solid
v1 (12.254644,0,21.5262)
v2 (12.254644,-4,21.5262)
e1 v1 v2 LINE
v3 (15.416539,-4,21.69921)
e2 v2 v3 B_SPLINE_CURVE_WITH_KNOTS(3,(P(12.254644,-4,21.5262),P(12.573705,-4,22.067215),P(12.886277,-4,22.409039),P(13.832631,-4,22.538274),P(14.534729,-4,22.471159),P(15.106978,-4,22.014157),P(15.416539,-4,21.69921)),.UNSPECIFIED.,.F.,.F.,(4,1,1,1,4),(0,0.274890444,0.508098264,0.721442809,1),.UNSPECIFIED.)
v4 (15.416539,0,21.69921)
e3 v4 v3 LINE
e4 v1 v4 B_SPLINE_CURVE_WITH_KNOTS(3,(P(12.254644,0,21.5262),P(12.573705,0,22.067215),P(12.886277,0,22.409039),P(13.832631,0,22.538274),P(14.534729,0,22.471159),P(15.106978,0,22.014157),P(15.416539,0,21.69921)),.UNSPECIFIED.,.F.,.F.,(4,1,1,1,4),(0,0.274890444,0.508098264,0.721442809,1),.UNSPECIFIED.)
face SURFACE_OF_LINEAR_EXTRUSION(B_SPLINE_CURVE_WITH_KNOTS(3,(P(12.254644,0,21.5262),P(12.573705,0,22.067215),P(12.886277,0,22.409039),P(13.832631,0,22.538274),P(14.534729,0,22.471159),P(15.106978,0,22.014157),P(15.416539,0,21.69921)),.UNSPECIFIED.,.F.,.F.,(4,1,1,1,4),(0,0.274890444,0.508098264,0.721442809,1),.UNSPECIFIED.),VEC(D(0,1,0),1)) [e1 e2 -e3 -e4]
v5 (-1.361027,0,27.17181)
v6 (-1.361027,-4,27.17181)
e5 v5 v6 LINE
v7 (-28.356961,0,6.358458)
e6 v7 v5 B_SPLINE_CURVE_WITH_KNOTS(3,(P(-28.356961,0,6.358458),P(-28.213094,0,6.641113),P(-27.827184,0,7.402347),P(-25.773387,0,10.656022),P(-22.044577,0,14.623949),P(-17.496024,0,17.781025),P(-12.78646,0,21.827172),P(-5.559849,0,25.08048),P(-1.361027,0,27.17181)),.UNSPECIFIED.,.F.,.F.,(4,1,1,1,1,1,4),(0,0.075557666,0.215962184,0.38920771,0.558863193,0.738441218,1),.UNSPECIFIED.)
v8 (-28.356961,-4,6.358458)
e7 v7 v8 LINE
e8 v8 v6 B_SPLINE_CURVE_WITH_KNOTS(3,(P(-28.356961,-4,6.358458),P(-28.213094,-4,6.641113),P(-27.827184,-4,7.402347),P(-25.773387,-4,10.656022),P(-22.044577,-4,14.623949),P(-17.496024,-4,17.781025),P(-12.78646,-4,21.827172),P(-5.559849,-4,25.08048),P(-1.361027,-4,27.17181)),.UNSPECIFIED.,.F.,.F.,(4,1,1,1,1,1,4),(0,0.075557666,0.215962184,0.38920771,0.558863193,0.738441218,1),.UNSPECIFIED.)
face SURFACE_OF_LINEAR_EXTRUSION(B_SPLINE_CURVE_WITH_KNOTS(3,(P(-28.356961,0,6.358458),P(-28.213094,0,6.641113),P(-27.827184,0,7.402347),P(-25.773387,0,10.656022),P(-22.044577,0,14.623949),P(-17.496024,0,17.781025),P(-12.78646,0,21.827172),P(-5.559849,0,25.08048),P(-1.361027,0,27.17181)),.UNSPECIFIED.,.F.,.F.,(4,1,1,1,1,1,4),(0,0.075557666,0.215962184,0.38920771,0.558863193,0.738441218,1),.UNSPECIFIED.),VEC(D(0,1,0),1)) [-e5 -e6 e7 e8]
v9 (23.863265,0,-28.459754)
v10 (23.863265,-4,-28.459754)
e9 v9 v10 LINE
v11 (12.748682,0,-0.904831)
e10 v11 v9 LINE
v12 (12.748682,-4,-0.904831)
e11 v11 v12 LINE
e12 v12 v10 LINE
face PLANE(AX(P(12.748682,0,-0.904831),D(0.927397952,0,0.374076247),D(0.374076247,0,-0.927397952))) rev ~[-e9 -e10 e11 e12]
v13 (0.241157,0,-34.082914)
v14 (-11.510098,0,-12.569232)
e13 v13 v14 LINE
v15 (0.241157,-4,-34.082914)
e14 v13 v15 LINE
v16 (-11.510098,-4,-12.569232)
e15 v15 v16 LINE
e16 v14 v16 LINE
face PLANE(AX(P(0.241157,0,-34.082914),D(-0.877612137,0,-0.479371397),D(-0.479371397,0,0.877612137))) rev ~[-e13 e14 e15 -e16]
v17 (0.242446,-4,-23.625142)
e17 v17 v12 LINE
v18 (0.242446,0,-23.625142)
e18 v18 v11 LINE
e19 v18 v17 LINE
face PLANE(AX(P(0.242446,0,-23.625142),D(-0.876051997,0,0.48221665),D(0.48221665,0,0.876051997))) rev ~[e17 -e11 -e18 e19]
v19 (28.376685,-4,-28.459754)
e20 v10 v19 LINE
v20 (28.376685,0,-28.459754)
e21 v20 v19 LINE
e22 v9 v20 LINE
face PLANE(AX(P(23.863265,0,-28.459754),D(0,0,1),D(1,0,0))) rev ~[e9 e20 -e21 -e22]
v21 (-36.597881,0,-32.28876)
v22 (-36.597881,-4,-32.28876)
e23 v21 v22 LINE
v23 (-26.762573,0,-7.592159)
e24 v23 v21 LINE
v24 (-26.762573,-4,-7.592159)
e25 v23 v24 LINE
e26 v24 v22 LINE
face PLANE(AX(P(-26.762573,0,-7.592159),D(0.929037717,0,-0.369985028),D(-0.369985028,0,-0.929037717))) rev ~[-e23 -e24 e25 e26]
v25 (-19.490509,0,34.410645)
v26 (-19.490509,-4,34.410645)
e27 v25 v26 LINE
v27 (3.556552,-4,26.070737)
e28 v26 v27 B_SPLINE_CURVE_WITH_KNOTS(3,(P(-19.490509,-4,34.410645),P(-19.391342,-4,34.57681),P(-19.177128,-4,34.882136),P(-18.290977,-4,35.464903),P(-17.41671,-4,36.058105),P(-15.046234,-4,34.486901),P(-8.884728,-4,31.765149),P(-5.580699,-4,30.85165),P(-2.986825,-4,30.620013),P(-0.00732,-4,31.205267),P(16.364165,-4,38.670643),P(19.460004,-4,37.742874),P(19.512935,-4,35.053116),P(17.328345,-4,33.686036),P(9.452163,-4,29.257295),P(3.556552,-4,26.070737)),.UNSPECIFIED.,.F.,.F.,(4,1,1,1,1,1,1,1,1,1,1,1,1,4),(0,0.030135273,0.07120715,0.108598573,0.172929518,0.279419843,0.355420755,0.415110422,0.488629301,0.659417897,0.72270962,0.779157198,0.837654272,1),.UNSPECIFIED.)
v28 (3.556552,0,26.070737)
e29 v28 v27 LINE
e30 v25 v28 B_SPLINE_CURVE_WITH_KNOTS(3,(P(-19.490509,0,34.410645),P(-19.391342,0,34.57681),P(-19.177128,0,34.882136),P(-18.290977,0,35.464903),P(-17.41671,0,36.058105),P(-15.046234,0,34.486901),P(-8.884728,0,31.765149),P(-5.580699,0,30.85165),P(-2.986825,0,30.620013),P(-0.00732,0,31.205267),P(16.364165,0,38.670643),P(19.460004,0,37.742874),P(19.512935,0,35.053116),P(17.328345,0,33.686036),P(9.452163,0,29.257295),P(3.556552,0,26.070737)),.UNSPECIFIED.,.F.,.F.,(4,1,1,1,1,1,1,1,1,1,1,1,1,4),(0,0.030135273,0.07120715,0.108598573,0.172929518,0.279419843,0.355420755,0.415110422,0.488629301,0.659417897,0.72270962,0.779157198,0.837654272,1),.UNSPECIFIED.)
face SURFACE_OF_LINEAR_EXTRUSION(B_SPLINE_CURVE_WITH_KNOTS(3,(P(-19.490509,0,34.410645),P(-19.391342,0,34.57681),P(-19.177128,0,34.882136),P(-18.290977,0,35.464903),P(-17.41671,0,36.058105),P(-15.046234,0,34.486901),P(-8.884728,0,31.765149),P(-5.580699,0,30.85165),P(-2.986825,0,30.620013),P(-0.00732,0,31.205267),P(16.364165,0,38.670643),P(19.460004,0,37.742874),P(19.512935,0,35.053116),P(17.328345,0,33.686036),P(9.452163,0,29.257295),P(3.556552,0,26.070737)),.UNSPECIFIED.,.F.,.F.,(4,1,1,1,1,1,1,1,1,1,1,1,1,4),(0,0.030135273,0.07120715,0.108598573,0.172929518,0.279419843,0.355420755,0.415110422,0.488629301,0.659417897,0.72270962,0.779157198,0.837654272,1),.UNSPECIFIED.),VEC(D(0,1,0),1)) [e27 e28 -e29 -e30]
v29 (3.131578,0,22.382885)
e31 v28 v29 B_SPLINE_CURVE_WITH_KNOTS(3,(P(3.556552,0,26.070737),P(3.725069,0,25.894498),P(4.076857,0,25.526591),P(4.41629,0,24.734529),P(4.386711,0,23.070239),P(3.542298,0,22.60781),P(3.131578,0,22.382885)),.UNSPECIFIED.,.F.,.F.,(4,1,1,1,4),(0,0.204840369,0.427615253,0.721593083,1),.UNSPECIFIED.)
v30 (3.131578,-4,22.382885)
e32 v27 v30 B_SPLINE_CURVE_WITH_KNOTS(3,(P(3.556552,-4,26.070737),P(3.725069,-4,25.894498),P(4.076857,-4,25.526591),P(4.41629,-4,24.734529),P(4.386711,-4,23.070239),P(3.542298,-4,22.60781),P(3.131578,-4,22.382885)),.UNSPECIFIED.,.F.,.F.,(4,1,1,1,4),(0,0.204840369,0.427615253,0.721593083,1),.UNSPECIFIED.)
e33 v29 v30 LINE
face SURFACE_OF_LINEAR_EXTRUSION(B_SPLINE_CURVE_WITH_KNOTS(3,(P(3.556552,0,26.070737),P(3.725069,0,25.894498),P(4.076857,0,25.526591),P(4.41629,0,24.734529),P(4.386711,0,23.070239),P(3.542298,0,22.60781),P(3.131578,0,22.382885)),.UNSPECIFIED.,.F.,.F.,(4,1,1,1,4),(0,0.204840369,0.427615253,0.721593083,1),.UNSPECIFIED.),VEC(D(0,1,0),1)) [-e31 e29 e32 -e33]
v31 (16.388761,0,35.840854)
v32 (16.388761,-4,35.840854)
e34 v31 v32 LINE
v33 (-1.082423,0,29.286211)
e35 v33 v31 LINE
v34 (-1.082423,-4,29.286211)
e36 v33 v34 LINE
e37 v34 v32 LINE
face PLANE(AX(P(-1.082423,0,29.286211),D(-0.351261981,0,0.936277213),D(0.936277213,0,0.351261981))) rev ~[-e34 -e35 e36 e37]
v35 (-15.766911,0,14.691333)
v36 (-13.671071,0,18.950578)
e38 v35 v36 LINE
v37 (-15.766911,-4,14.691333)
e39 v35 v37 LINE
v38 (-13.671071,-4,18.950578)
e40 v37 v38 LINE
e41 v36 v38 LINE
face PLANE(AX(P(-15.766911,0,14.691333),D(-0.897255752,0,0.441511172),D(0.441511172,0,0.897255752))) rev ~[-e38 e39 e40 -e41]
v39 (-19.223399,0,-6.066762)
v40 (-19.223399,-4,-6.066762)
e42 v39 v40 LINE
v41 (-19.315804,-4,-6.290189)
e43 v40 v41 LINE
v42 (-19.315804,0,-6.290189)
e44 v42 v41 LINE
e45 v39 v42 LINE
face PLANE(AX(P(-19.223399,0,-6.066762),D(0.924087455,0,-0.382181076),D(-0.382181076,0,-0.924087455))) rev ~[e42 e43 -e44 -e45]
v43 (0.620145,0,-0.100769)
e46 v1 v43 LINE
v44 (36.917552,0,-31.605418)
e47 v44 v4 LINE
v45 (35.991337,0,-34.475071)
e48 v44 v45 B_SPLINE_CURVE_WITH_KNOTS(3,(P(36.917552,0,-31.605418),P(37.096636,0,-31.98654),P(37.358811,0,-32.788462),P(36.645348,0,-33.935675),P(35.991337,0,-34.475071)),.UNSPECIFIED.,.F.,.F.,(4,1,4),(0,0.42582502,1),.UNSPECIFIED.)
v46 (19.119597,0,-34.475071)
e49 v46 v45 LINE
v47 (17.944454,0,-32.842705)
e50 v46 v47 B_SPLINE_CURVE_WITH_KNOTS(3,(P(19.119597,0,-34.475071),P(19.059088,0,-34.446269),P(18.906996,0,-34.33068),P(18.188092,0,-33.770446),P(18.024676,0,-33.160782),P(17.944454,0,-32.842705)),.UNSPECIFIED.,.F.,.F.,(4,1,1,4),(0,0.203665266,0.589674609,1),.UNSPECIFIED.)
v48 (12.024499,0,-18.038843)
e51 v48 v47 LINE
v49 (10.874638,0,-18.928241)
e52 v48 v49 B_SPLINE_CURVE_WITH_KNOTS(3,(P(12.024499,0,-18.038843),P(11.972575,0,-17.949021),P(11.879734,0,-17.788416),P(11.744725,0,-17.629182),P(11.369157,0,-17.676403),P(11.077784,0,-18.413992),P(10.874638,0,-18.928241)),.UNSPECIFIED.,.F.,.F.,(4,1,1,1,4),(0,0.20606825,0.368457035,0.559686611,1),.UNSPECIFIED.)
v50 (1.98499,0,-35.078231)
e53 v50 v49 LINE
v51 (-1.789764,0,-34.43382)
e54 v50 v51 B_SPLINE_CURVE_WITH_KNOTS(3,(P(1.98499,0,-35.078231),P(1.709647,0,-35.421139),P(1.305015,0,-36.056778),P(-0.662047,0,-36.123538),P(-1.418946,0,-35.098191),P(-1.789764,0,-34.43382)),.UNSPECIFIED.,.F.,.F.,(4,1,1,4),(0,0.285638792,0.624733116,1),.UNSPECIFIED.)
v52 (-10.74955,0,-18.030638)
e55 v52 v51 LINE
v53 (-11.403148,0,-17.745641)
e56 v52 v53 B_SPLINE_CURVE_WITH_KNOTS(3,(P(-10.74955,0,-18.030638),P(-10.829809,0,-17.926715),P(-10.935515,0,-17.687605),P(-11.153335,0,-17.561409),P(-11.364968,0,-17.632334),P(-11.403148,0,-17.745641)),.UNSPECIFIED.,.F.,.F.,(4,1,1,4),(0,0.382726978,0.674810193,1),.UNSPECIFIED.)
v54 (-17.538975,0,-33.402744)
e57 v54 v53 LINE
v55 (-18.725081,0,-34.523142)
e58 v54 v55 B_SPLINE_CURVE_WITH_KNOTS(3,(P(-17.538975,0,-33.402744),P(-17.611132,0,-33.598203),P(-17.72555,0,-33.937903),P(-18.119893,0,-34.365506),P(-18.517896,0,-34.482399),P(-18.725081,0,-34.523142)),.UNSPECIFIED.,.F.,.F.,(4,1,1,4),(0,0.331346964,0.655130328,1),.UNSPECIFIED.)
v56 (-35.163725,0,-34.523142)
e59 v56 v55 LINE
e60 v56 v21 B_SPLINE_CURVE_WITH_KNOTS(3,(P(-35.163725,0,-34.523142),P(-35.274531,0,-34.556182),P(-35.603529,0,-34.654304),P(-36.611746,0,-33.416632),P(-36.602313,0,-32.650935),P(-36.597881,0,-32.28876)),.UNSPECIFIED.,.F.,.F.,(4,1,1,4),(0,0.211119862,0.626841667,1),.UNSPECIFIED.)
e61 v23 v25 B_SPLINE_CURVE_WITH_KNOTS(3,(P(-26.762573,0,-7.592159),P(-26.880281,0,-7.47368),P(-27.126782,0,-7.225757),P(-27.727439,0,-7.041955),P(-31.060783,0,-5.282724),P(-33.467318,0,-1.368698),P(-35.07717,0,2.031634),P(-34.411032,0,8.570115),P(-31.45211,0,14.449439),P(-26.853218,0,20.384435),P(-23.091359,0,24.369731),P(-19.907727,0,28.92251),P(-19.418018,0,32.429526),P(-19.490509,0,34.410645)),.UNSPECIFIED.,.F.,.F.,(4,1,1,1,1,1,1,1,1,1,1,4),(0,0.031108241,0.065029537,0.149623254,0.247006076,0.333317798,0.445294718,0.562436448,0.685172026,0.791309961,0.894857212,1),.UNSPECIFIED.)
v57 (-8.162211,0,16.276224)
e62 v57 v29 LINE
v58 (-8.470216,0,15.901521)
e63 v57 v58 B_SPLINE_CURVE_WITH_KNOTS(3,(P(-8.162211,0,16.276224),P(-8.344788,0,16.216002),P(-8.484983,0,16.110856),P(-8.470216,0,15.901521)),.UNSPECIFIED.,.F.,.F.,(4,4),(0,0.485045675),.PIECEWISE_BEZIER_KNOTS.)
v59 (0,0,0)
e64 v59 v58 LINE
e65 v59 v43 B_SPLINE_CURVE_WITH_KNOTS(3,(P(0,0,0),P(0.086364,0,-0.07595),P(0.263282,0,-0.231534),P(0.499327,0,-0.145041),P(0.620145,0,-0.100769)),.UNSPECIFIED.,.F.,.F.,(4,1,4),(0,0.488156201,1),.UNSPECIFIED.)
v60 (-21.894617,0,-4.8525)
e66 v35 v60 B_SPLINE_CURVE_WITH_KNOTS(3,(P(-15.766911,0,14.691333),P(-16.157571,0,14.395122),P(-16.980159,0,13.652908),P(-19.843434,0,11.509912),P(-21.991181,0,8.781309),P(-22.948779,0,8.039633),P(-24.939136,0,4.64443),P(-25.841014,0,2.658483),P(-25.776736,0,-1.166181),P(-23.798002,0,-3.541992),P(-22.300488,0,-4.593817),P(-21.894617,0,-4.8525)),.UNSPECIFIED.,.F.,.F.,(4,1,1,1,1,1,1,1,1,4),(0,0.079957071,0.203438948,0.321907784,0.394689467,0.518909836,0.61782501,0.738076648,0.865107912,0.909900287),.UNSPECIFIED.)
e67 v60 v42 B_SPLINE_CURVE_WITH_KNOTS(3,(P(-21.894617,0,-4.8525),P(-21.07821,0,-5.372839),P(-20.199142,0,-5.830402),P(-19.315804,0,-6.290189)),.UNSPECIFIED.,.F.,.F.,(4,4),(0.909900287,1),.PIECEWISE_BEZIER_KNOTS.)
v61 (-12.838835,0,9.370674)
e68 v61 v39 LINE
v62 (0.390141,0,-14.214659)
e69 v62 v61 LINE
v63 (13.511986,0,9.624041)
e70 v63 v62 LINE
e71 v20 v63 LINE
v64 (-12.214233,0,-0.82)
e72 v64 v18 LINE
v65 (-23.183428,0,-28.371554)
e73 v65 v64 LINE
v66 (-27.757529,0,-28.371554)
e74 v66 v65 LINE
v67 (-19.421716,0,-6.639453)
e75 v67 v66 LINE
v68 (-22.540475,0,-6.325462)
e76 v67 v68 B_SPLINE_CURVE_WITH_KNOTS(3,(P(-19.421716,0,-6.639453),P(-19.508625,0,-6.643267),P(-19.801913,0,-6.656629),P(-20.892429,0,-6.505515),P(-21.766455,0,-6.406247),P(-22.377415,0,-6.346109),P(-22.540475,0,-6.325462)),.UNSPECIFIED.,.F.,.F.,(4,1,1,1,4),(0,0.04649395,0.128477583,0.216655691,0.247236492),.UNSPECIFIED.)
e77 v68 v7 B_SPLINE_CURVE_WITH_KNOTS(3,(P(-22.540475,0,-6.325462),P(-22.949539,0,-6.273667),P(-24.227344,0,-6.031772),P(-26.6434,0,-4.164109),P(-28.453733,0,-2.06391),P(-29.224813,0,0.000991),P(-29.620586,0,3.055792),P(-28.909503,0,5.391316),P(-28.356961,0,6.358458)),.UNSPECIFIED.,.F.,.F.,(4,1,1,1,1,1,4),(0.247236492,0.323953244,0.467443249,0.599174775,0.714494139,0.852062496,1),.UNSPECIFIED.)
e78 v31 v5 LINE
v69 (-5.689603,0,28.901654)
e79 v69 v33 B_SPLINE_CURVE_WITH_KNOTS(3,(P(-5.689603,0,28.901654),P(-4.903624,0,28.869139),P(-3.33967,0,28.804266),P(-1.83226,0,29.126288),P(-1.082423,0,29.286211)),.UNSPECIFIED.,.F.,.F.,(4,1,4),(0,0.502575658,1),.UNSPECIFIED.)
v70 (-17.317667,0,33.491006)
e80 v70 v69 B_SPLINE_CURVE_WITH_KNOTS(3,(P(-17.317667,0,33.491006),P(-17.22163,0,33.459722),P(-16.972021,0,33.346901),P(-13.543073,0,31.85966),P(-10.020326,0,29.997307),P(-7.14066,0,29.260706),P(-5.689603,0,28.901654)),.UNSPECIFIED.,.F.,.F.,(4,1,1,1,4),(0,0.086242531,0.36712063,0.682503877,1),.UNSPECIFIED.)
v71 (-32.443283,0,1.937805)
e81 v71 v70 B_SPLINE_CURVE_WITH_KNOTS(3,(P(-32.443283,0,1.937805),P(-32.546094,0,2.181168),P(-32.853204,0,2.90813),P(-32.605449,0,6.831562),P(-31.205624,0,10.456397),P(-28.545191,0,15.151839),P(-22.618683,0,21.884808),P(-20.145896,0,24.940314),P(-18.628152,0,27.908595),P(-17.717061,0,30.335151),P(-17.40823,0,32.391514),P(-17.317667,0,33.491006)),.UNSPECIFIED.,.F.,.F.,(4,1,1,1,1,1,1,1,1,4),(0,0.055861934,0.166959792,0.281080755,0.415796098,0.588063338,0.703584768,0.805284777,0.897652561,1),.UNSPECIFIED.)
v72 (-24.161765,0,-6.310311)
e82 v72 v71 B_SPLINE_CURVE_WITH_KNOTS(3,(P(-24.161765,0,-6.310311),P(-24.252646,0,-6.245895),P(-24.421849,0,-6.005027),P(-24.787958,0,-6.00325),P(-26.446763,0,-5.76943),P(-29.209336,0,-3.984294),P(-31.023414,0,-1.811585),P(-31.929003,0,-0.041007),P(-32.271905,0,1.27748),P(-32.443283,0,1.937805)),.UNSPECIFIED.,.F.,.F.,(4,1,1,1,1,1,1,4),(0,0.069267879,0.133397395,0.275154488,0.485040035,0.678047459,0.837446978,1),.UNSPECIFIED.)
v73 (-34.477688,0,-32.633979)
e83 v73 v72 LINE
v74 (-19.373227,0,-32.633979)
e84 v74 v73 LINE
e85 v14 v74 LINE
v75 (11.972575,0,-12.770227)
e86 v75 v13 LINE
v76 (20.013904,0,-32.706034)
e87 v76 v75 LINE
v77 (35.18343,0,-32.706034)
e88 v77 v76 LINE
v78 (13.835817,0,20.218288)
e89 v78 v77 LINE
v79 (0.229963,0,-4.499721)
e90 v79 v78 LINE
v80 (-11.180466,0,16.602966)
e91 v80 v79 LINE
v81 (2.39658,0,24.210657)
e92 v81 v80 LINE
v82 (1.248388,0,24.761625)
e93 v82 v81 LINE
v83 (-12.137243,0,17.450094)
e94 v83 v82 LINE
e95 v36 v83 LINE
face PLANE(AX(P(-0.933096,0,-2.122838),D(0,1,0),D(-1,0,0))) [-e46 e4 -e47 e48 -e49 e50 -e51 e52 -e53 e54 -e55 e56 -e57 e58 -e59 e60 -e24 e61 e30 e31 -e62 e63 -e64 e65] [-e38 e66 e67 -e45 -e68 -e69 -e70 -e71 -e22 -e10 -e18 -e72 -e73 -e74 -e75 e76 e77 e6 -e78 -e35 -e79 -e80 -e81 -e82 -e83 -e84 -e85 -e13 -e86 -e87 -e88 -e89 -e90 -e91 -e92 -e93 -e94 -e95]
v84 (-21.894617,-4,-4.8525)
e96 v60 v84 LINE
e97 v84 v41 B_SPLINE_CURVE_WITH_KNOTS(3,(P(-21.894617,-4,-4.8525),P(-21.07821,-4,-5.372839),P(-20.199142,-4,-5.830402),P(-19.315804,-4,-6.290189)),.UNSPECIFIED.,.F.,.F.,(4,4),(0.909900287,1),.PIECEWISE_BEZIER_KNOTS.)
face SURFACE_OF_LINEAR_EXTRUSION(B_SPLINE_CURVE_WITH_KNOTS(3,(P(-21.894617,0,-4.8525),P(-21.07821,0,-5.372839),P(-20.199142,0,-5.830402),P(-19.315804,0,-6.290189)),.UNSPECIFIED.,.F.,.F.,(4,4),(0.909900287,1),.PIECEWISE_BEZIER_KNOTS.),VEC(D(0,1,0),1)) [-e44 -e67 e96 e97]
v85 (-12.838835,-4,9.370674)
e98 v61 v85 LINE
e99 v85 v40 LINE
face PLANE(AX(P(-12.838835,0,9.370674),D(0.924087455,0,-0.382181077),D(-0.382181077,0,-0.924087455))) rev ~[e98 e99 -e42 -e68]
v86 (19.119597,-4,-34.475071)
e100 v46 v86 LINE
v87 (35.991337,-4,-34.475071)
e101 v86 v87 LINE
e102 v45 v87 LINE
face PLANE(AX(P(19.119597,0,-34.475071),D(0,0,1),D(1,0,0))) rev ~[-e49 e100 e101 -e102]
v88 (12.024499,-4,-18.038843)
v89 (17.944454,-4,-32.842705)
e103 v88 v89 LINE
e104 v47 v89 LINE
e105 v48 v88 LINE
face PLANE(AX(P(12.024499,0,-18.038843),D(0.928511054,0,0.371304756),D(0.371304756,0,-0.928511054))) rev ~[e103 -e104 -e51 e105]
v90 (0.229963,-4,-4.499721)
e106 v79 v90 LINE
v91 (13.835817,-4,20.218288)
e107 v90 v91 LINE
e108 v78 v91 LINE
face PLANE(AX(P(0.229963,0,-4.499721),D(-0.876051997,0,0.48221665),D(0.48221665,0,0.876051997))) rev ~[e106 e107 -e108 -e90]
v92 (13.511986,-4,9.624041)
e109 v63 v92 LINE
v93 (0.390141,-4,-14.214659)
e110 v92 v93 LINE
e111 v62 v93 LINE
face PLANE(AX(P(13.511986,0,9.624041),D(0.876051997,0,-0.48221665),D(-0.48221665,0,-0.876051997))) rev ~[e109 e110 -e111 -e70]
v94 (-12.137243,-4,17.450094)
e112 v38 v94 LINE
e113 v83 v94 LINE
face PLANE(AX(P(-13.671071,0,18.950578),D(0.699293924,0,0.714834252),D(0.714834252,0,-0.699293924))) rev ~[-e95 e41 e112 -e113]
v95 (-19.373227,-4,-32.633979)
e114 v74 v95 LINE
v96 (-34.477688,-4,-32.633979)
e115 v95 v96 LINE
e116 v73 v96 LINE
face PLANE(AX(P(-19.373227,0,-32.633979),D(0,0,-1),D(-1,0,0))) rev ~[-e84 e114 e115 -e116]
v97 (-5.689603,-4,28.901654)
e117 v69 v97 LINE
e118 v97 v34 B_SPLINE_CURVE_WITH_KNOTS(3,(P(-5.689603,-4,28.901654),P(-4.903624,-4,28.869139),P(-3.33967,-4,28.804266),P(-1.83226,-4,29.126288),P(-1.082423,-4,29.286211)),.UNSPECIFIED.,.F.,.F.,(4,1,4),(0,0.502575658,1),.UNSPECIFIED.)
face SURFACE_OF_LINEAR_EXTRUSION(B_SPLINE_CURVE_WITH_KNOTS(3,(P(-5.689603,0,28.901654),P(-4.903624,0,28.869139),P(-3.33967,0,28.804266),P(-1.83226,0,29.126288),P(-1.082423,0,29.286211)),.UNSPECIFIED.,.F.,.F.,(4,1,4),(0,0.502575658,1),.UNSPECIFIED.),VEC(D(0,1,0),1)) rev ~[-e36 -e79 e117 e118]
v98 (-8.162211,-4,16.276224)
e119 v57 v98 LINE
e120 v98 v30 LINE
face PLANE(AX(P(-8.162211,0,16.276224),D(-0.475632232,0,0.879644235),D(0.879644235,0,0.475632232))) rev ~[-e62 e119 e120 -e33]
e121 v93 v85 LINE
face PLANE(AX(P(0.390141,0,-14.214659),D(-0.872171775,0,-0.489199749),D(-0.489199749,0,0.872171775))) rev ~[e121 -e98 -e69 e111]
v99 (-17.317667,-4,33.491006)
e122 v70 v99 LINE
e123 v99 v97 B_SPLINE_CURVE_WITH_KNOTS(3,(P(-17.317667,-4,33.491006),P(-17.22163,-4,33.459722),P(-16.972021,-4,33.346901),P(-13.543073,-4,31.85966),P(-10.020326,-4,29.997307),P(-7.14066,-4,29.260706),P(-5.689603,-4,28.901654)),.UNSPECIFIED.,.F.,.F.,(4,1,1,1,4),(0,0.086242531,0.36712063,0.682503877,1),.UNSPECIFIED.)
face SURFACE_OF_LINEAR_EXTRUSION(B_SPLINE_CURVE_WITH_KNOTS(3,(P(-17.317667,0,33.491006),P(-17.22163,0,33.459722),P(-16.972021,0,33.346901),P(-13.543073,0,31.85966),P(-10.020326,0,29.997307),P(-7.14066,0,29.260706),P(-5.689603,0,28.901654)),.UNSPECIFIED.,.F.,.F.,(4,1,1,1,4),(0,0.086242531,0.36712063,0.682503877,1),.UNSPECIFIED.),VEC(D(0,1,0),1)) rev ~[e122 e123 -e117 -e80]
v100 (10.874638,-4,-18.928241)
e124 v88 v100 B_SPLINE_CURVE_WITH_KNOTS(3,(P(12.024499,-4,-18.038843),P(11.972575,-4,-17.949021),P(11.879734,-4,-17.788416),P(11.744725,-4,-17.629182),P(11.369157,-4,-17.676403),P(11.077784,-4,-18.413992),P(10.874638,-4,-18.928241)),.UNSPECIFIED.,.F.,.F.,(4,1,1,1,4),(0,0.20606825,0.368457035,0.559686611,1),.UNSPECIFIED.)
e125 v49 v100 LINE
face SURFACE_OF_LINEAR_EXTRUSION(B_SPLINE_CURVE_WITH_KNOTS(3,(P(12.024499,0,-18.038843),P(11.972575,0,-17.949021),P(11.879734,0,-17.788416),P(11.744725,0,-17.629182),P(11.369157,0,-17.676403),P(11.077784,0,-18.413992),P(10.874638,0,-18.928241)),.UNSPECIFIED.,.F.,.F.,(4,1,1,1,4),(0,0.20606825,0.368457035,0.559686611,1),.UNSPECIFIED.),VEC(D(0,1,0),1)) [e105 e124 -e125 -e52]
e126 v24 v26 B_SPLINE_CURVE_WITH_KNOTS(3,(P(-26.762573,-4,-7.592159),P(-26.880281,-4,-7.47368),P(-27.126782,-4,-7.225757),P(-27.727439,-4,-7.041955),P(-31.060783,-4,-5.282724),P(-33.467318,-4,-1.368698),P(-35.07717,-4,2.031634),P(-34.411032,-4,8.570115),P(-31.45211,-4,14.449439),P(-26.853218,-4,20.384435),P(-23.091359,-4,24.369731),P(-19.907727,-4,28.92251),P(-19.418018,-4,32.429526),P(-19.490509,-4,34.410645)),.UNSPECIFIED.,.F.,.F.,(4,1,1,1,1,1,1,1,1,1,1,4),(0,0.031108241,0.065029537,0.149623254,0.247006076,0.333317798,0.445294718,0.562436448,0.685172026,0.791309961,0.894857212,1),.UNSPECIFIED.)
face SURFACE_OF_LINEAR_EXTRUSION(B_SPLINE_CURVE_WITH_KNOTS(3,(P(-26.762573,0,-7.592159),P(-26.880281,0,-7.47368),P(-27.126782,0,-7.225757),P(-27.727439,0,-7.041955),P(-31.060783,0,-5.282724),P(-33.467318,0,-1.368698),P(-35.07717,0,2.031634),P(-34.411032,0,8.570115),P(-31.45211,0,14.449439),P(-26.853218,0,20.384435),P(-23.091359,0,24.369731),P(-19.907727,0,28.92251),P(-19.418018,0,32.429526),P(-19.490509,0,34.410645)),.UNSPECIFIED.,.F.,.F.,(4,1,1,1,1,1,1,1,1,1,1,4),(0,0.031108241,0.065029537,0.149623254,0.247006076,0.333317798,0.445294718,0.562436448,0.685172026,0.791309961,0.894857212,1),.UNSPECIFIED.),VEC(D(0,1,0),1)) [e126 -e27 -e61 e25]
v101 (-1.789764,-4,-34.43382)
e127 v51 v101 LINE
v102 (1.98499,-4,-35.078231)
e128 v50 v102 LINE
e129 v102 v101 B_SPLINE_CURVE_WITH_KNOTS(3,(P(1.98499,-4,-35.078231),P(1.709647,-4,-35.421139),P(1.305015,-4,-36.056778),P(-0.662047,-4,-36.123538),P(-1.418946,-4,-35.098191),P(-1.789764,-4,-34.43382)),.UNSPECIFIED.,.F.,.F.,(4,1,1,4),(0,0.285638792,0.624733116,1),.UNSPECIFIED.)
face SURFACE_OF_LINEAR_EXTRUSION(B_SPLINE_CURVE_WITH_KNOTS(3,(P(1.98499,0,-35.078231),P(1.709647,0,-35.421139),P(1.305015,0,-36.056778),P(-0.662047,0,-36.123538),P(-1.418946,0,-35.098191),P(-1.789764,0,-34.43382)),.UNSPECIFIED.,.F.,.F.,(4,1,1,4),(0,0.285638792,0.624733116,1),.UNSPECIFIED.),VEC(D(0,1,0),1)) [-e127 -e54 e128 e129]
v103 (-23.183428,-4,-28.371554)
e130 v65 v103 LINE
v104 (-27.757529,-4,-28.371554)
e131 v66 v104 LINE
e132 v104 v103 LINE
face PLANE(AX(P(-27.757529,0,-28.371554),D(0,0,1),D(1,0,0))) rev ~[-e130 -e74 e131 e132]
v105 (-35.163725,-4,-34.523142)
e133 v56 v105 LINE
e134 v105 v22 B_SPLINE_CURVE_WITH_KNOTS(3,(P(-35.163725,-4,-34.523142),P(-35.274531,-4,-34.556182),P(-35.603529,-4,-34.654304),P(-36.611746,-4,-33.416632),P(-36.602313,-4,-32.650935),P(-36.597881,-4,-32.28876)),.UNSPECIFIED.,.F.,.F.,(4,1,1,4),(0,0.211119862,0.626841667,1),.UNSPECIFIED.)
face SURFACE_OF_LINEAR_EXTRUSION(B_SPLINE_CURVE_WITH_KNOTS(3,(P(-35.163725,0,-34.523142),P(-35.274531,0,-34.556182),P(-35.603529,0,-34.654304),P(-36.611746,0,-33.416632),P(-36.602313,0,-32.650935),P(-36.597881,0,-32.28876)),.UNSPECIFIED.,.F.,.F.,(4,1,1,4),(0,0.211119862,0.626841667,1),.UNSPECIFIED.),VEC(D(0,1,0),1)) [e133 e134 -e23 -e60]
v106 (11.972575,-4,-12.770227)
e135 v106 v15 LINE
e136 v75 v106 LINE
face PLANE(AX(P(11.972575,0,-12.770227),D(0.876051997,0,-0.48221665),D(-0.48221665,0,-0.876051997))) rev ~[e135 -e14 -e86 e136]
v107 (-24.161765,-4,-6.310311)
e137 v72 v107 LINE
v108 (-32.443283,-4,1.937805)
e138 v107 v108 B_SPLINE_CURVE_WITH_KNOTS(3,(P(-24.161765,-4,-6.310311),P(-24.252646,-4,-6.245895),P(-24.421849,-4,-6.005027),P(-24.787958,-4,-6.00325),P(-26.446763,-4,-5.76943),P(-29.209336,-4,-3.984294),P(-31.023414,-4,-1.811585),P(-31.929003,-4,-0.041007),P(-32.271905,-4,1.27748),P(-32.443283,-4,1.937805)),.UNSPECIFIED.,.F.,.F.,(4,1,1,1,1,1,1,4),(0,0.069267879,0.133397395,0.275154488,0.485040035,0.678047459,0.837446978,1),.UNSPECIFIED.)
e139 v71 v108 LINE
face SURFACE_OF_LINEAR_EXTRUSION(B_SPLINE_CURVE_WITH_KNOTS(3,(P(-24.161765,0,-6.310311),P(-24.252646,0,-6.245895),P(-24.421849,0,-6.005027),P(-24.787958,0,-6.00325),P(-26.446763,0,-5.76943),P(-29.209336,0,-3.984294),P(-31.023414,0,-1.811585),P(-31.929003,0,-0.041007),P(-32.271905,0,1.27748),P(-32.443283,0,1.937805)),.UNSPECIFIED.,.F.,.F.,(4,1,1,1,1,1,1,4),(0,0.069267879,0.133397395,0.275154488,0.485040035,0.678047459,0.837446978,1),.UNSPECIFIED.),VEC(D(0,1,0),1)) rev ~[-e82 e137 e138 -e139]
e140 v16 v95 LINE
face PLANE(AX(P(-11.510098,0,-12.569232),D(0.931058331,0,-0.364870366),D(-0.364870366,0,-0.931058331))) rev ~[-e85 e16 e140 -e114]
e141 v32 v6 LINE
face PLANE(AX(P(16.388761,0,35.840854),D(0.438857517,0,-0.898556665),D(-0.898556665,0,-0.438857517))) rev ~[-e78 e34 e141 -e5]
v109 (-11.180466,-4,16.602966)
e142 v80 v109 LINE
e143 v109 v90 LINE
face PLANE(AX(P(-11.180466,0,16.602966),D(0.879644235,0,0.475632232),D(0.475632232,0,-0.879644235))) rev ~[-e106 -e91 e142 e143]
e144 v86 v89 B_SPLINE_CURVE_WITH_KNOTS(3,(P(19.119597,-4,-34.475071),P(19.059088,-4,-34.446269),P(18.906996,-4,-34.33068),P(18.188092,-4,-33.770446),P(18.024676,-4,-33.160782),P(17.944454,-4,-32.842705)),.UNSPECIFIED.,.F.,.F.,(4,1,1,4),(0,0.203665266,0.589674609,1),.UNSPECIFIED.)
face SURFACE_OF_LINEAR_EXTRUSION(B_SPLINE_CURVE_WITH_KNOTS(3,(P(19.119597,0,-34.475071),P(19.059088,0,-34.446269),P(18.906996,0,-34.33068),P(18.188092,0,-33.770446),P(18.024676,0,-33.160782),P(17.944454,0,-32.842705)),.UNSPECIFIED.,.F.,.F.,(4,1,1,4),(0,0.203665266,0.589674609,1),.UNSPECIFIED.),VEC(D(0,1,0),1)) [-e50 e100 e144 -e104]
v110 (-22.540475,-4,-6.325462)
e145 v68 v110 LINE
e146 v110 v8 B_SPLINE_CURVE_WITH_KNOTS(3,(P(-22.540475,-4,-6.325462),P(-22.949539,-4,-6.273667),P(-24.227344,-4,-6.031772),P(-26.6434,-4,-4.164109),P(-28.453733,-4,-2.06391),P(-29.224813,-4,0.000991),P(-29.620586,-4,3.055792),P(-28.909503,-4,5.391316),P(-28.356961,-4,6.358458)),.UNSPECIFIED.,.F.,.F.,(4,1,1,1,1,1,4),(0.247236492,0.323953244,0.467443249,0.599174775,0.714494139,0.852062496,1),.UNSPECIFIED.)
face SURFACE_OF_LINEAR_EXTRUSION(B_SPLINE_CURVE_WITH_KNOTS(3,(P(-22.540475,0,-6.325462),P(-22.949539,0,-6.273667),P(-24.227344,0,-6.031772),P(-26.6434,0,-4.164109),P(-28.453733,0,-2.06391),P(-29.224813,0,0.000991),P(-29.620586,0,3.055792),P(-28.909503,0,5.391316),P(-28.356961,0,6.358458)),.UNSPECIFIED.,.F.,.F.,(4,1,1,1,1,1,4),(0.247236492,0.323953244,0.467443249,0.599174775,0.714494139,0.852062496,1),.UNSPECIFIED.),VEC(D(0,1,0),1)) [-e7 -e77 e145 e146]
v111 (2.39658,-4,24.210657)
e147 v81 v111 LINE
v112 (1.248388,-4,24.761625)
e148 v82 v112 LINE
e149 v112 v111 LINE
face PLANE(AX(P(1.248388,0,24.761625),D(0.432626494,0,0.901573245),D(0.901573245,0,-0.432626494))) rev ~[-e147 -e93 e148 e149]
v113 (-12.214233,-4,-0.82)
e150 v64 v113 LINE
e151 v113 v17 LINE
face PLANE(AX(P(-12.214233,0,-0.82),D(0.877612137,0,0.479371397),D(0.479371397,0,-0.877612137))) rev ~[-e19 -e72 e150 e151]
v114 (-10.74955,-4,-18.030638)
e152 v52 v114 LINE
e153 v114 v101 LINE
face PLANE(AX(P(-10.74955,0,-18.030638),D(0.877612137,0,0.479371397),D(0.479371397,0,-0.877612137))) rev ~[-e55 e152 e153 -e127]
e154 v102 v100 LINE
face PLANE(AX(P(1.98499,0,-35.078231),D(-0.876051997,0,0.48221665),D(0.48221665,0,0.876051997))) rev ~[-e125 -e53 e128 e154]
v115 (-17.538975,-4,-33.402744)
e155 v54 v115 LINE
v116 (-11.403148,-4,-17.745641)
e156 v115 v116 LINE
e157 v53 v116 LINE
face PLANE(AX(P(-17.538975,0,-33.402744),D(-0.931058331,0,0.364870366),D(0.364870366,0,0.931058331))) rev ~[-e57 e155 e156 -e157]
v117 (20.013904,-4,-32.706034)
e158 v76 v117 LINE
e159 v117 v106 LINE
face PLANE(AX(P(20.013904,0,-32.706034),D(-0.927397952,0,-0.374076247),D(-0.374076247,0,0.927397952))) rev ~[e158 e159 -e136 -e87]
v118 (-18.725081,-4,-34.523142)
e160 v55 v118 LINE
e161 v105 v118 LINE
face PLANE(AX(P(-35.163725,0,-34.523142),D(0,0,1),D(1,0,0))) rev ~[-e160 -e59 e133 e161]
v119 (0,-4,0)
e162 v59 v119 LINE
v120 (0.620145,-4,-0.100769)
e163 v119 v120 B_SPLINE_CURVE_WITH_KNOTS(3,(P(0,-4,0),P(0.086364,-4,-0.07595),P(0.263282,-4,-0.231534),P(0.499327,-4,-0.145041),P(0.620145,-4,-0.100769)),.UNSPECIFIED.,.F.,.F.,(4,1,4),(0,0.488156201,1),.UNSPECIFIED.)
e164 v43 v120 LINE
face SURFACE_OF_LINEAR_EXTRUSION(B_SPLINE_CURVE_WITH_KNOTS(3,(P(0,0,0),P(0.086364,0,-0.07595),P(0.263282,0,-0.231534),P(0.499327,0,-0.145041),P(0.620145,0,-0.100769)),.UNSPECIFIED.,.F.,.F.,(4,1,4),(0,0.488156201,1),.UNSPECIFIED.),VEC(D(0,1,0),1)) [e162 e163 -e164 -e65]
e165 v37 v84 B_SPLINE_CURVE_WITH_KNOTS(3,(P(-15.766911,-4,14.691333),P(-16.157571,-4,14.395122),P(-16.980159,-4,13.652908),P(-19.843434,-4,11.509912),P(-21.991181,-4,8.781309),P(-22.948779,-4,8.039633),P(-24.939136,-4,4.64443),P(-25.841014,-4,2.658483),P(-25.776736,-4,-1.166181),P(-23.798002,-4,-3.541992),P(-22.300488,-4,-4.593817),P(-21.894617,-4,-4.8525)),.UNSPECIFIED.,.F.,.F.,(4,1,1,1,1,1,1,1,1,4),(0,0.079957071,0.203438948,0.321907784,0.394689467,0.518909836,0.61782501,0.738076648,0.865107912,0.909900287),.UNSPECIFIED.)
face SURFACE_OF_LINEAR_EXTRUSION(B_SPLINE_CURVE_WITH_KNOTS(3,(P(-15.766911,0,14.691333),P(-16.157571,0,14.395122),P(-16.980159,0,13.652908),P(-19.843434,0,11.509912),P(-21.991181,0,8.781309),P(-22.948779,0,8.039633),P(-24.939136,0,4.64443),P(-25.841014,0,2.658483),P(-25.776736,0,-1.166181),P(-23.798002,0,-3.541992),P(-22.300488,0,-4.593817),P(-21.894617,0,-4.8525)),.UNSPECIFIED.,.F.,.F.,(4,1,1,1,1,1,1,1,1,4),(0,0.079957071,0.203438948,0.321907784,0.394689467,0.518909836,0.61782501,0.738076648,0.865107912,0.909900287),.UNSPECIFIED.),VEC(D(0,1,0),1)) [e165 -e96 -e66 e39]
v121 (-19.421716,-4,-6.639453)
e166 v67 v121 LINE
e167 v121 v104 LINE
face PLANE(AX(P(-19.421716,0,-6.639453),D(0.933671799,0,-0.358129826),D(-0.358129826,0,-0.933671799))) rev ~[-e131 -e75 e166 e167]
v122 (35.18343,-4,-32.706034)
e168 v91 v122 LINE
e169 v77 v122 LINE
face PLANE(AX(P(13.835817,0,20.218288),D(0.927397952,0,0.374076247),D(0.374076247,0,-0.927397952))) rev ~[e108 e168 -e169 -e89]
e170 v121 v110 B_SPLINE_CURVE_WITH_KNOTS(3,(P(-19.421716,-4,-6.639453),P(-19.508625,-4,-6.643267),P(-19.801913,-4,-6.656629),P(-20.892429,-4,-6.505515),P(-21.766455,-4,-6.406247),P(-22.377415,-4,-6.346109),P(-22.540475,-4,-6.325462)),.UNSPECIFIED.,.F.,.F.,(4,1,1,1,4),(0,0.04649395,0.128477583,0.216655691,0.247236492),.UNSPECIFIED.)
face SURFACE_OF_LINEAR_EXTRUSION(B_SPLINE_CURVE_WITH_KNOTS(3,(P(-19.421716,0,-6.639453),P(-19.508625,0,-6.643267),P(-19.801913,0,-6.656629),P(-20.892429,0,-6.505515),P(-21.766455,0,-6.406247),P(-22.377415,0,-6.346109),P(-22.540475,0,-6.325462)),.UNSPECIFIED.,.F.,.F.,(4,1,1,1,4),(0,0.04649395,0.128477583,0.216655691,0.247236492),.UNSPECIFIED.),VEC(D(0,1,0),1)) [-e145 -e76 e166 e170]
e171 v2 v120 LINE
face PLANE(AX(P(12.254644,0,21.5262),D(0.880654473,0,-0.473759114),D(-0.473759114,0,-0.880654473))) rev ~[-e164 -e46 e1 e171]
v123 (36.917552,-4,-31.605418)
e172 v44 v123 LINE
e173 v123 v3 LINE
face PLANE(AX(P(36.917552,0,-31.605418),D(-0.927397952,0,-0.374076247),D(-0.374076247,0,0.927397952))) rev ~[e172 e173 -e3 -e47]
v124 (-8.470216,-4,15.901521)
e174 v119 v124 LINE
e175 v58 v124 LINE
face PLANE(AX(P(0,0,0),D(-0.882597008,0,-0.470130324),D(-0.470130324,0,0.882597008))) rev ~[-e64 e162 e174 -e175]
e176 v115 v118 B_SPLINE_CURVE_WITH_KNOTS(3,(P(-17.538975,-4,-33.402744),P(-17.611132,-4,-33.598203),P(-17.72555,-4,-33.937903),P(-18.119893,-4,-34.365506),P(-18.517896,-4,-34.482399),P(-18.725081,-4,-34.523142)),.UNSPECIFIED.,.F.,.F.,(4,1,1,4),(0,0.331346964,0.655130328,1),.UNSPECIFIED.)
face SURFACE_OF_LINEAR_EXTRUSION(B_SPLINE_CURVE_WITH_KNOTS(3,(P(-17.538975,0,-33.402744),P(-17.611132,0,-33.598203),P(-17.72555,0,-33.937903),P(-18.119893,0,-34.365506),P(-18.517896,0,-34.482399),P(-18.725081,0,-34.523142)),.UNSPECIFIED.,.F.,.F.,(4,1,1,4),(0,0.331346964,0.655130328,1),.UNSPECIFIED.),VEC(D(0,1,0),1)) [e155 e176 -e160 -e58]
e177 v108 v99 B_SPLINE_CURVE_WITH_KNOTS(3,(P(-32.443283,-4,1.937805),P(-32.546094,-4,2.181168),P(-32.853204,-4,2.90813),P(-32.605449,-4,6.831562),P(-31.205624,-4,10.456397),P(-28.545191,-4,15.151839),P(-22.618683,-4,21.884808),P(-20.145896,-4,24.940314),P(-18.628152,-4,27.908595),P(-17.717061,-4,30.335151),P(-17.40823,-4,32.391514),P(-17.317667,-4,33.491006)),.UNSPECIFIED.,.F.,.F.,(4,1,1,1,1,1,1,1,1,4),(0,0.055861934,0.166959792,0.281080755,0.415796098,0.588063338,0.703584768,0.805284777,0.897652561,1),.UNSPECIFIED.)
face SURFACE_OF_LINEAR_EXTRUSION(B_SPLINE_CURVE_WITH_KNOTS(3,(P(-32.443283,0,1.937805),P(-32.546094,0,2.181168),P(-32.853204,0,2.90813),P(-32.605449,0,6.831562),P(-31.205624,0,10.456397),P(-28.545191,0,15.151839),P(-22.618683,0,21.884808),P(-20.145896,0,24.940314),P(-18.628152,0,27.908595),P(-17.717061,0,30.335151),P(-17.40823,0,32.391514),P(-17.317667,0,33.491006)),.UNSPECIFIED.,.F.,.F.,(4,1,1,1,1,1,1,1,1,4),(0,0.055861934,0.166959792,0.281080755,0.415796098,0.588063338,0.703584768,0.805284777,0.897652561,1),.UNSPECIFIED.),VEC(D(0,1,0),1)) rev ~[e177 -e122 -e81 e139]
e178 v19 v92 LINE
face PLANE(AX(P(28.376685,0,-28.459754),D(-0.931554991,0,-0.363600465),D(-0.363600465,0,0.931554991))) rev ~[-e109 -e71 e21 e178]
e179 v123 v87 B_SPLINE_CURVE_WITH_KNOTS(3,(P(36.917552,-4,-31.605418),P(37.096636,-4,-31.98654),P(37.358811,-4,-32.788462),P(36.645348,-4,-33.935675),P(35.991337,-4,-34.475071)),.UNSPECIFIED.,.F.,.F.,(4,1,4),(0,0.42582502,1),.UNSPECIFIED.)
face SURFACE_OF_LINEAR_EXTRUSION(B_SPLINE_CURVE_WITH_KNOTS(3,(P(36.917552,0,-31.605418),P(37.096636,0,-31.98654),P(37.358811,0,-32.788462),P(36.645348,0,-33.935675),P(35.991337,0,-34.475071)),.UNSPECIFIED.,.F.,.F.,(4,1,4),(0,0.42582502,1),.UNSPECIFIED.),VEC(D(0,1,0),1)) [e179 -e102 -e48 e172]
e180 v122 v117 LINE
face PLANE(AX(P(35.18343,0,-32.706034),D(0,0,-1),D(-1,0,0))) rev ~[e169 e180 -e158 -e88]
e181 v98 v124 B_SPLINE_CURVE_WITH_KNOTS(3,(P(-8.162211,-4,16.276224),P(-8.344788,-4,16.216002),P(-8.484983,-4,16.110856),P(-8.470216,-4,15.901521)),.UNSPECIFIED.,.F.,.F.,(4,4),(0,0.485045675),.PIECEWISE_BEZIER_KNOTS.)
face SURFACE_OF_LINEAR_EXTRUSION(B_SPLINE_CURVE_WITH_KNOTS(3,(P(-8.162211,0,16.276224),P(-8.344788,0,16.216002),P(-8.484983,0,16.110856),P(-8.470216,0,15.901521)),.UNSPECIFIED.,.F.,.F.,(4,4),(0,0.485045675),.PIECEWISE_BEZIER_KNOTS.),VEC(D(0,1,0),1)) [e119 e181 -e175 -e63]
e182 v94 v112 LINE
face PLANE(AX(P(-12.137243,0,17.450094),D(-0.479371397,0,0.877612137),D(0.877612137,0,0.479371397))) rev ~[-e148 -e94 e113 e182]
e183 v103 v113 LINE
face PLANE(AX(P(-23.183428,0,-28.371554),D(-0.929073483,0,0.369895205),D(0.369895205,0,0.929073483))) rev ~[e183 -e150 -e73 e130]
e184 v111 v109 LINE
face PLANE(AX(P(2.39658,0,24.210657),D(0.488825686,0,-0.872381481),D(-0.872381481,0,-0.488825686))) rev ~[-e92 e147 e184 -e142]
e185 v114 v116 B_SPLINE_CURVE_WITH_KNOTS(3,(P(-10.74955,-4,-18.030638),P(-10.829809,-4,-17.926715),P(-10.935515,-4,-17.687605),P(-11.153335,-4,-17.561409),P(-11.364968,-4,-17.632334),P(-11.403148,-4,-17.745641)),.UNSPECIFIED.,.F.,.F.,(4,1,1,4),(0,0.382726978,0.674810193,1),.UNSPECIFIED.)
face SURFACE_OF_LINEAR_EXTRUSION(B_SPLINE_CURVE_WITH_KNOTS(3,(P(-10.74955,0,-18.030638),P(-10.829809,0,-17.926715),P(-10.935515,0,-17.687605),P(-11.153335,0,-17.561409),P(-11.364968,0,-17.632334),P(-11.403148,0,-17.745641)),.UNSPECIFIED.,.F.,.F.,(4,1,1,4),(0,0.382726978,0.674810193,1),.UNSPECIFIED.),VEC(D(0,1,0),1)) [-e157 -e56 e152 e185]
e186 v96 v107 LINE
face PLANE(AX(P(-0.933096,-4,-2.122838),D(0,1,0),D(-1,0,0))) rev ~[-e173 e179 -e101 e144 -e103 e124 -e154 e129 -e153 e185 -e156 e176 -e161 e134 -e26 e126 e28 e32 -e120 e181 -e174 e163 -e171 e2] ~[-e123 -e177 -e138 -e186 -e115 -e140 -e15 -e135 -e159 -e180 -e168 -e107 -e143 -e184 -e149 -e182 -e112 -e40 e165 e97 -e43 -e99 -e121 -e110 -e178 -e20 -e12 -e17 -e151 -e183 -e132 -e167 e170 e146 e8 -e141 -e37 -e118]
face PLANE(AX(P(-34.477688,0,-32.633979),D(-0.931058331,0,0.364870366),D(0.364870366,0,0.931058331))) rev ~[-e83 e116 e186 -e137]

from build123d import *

# Parameters (mm, degrees)
F1_DEPTH = 4
F3_DEPTH = 4


# Not quite as in the source:
# - the program builds the solid bodies; features that only make, move or delete a surface that nothing else refers to are left out


with BuildPart() as f1:
    # F0 (on Front) → F1 (new body)
    with BuildSketch(Plane.XZ):
        Polygon((-19.4217161833, -6.6394530033), (-27.7575291693, -28.3715538681), (-23.1834277511, -28.3715538681), (-12.2142331675, -0.81999955), (0.2424462854, -23.6251421751), (12.7486815966, -0.9048308448), (23.8632653011, -28.4597538413), (28.3766854557, -28.4597538413), (13.5119855407, 9.6240406854), (0.3901409885, -14.2146594537), (-12.8388348967, 9.3706743792), (-19.2233994603, -6.0667619109), (-19.315803546, -6.2901886101), (-19.0307870507, -6.5492987633), align=None)
    extrude(amount=F1_DEPTH)

    # F0 (on Front) → F3 (join)
    with BuildSketch(Plane.XZ):
        with BuildLine():
            add(Edge.make_bspline(
                [(-35.1637251496, -34.5231422063), (-35.2745312626, -34.5561823678), (-35.6035289606, -34.654304467), (-36.6117457532, -33.4166323146), (-36.6023133695, -32.6509350181), (-36.5978814662, -32.2887599468)],
                knots=[0, 0, 0, 0, 0.2111198615, 0.6268416674, 1, 1, 1, 1], degree=3))
            Line((-35.1637251496, -34.5231422063), (-18.7250807702, -34.5231422063))
            add(Edge.make_bspline(
                [(-17.538975038, -33.402744049), (-17.611132101, -33.5982034924), (-17.7255501876, -33.9379030837), (-18.1198933231, -34.3655062286), (-18.5178964655, -34.4823988841), (-18.7250807702, -34.5231422063)],
                knots=[0, 0, 0, 0, 0.3313469636, 0.6551303283, 1, 1, 1, 1], degree=3))
            Line((-17.538975038, -33.402744049), (-11.4031481076, -17.7456413598))
            add(Edge.make_bspline(
                [(-10.749549605, -18.0306378752), (-10.8298087166, -17.9267145736), (-10.9355150168, -17.6876046133), (-11.1533348511, -17.5614089352), (-11.3649684936, -17.6323335618), (-11.4031481076, -17.7456413598)],
                knots=[0, 0, 0, 0, 0.3827269779, 0.6748101929, 1, 1, 1, 1], degree=3))
            Line((-10.749549605, -18.0306378752), (-1.789764151, -34.4338202755))
            add(Edge.make_bspline(
                [(1.9849899689, -35.0782312452), (1.7096466368, -35.4211391418), (1.3050154791, -36.05677829), (-0.6620473159, -36.123537512), (-1.4189460368, -35.0981913004), (-1.789764151, -34.4338202755)],
                knots=[0, 0, 0, 0, 0.2856387916, 0.6247331157, 1, 1, 1, 1], degree=3))
            Line((1.9849899689, -35.0782312452), (10.8746383339, -18.9282409847))
            add(Edge.make_bspline(
                [(12.0244985446, -18.0388428271), (11.9725750544, -17.9490208887), (11.8797340892, -17.78841621), (11.744725143, -17.6291823261), (11.3691565314, -17.67640337), (11.0777840099, -18.4139921669), (10.8746383339, -18.9282409847)],
                knots=[0, 0, 0, 0, 0.2060682504, 0.3684570355, 0.559686611, 1, 1, 1, 1], degree=3))
            Line((12.0244985446, -18.0388428271), (17.9444543715, -32.8427049722))
            add(Edge.make_bspline(
                [(19.1195974171, -34.4750714604), (19.0590878531, -34.4462685115), (18.9069963789, -34.3306804628), (18.1880916185, -33.7704461278), (18.0246763229, -33.1607819226), (17.9444543715, -32.8427049722)],
                knots=[0, 0, 0, 0, 0.2036652656, 0.5896746092, 1, 1, 1, 1], degree=3))
            Line((19.1195974171, -34.4750714604), (35.9913371503, -34.4750714604))
            add(Edge.make_bspline(
                [(36.917551974, -31.6054179477), (37.096636226, -31.9865397753), (37.358811422, -32.7884619292), (36.6453477203, -33.9356747232), (35.9913371503, -34.4750714604)],
                knots=[0, 0, 0, 0, 0.4258250202, 1, 1, 1, 1], degree=3))
            Line((36.917551974, -31.6054179477), (15.4165393649, 21.6992097865))
            add(Edge.make_bspline(
                [(12.2546441238, 21.5262000154), (12.5737046322, 22.0672148588), (12.886276927, 22.4090391583), (13.8326309549, 22.5382735172), (14.5347285525, 22.471159047), (15.1069781666, 22.0141567545), (15.4165393649, 21.6992097865)],
                knots=[0, 0, 0, 0, 0.2748904441, 0.5080982642, 0.721442809, 1, 1, 1, 1], degree=3))
            Line((12.2546441238, 21.5262000154), (0.6201447686, -0.1007694518))
            add(Edge.make_bspline(
                [(0, 0), (0.0863636294, -0.0759495763), (0.2632816512, -0.2315341538), (0.4993266168, -0.1450406271), (0.6201447686, -0.1007694518)],
                knots=[0, 0, 0, 0, 0.4881562014, 1, 1, 1, 1], degree=3))
            Line((0, 0), (-8.4702158347, 15.9015208483))
            add(Edge.make_bspline(
                [(-8.1622106954, 16.276223585), (-8.3447881043, 16.2160024047), (-8.4849828854, 16.110856086), (-8.4702158347, 15.9015208483)],
                knots=[0, 0, 0, 0, 0.4850456749, 0.4850456749, 0.4850456749, 0.4850456749], degree=3))
            Line((-8.1622106954, 16.276223585), (3.1315775122, 22.3828852177))
            add(Edge.make_bspline(
                [(3.5565522512, 26.0707366595), (3.7250692348, 25.8944983199), (4.0768574738, 25.526591336), (4.4162895921, 24.7345286511), (4.3867106206, 23.0702393334), (3.542298202, 22.6078100122), (3.1315775122, 22.3828852177)],
                knots=[0, 0, 0, 0, 0.2048403686, 0.4276152529, 0.721593083, 1, 1, 1, 1], degree=3))
            add(Edge.make_bspline(
                [(-19.4905090892, 34.4106449307), (-19.3913416638, 34.5768098105), (-19.1771283464, 34.8821357986), (-18.2909772268, 35.4649028918), (-17.4167100076, 36.0581049326), (-15.046233937, 34.4869007756), (-8.8847282905, 31.765149045), (-5.5806993412, 30.8516497616), (-2.9868246918, 30.6200128066), (-0.0073204146, 31.2052668466), (16.3641647116, 38.670642674), (19.4600039149, 37.7428738516), (19.5129350415, 35.0531160006), (17.3283449079, 33.686036308), (9.4521634968, 29.2572953328), (3.5565522512, 26.0707366595)],
                knots=[0, 0, 0, 0, 0.0301352733, 0.0712071496, 0.1085985734, 0.1729295184, 0.2794198429, 0.3554207551, 0.415110422, 0.4886293008, 0.6594178969, 0.7227096196, 0.779157198, 0.837654272, 1, 1, 1, 1], degree=3))
            add(Edge.make_bspline(
                [(-26.7625730485, -7.5921593234), (-26.8802814515, -7.4736795432), (-27.1267818843, -7.2257565373), (-27.7274393295, -7.041955029), (-31.0607833825, -5.2827244881), (-33.4673183648, -1.3686976246), (-35.0771704906, 2.0316336914), (-34.4110317157, 8.5701153917), (-31.4521100473, 14.4494388606), (-26.8532177553, 20.3844347406), (-23.0913588106, 24.3697313497), (-19.9077267416, 28.9225104401), (-19.4180184747, 32.4295257558), (-19.4905090892, 34.4106449307)],
                knots=[0, 0, 0, 0, 0.0311082407, 0.0650295367, 0.1496232536, 0.247006076, 0.3333177984, 0.4452947178, 0.5624364483, 0.6851720255, 0.7913099611, 0.8948572122, 1, 1, 1, 1], degree=3))
            Line((-26.7625730485, -7.5921593234), (-36.5978814662, -32.2887599468))
        make_face()
        with BuildLine():
            add(Edge.make_bspline(
                [(-19.4217161833, -6.6394530033), (-19.508625316, -6.6432673623), (-19.8019127291, -6.6566294917), (-20.8924289573, -6.5055145737), (-21.7664551749, -6.406246823), (-22.3774145873, -6.3461085054), (-22.540475484, -6.3254620685)],
                knots=[0, 0, 0, 0, 0.0464939501, 0.1284775828, 0.2166556913, 0.2472364924, 0.2472364924, 0.2472364924, 0.2472364924], degree=3))
            Line((-19.4217161833, -6.6394530033), (-19.0307870507, -6.5492987633))
            Line((-19.0307870507, -6.5492987633), (-19.315803546, -6.2901886101))
            add(Edge.make_bspline(
                [(-21.8946174861, -4.8524995225), (-21.0782101636, -5.3728390923), (-20.1991422317, -5.830401643), (-19.315803546, -6.2901886101)],
                knots=[0.9099002869, 0.9099002869, 0.9099002869, 0.9099002869, 1, 1, 1, 1], degree=3))
            add(Edge.make_bspline(
                [(-15.7669110892, 14.6913326426), (-16.1575708431, 14.3951216587), (-16.9801594317, 13.6529080865), (-19.8434335071, 11.5099121964), (-21.9911810035, 8.7813091437), (-22.9487788, 8.0396329391), (-24.9391358437, 4.6444296479), (-25.8410141184, 2.6584830617), (-25.7767362061, -1.1661814313), (-23.7980017987, -3.5419920665), (-22.300488065, -4.5938167343), (-21.8946174861, -4.8524995225)],
                knots=[0, 0, 0, 0, 0.0799570707, 0.2034389483, 0.3219077837, 0.3946894666, 0.5189098359, 0.61782501, 0.7380766484, 0.8651079121, 0.9099002869, 0.9099002869, 0.9099002869, 0.9099002869], degree=3))
            Line((-15.7669110892, 14.6913326426), (-13.6710712686, 18.9505778253))
            Line((-13.6710712686, 18.9505778253), (-12.1372425929, 17.450094223))
            Line((-12.1372425929, 17.450094223), (1.2483881547, 24.7616254087))
            Line((1.2483881547, 24.7616254087), (2.3965802164, 24.2106570771))
            Line((2.3965802164, 24.2106570771), (-11.1804655804, 16.6029661013))
            Line((-11.1804655804, 16.6029661013), (0.2299634238, -4.4997208142))
            Line((0.2299634238, -4.4997208142), (13.8358174466, 20.2182883726))
            Line((13.8358174466, 20.2182883726), (35.183429718, -32.7060341154))
            Line((35.183429718, -32.7060341154), (20.0139036961, -32.7060341154))
            Line((20.0139036961, -32.7060341154), (11.9725750544, -12.7702274851))
            Line((11.9725750544, -12.7702274851), (0.241156673, -34.082914424))
            Line((0.241156673, -34.082914424), (-11.5100983533, -12.5692319123))
            Line((-11.5100983533, -12.5692319123), (-19.3732271326, -32.6339788733))
            Line((-19.3732271326, -32.6339788733), (-34.4776880647, -32.6339788733))
            Line((-34.4776880647, -32.6339788733), (-24.161764784, -6.3103110171))
            add(Edge.make_bspline(
                [(-24.161764784, -6.3103110171), (-24.2526459585, -6.2458945342), (-24.4218489545, -6.005026647), (-24.7879581492, -6.0032503335), (-26.4467627622, -5.7694302637), (-29.2093356612, -3.9842936163), (-31.0234143453, -1.8115853262), (-31.9290028762, -0.041007341), (-32.2719053848, 1.2774798683), (-32.443283113, 1.9378054652)],
                knots=[0, 0, 0, 0, 0.0692678788, 0.1333973947, 0.2751544883, 0.4850400346, 0.6780474592, 0.8374469779, 1, 1, 1, 1], degree=3))
            add(Edge.make_bspline(
                [(-32.443283113, 1.9378054652), (-32.5460937273, 2.1811675539), (-32.8532037362, 2.9081303087), (-32.6054490494, 6.8315619317), (-31.2056244589, 10.456396718), (-28.545190558, 15.1518389989), (-22.618683209, 21.884807743), (-20.1458962988, 24.9403144345), (-18.6281517866, 27.908594809), (-17.7170611806, 30.3351509939), (-17.4082297731, 32.3915139026), (-17.3176672584, 33.4910062724)],
                knots=[0, 0, 0, 0, 0.0558619343, 0.1669597916, 0.2810807549, 0.415796098, 0.588063338, 0.7035847677, 0.8052847768, 0.8976525607, 1, 1, 1, 1], degree=3))
            add(Edge.make_bspline(
                [(-17.3176672584, 33.4910062724), (-17.221630037, 33.4597220725), (-16.9720207923, 33.3469005033), (-13.5430734754, 31.8596596856), (-10.0203260912, 29.9973066976), (-7.1406603696, 29.2607063143), (-5.6896028796, 28.9016544729)],
                knots=[0, 0, 0, 0, 0.0862425306, 0.3671206301, 0.682503877, 1, 1, 1, 1], degree=3))
            add(Edge.make_bspline(
                [(-5.6896028796, 28.9016544729), (-4.9036243336, 28.8691385408), (-3.3396702778, 28.8042656638), (-1.8322599185, 29.1262884352), (-1.0824227938, 29.2862113565)],
                knots=[0, 0, 0, 0, 0.5025756584, 1, 1, 1, 1], degree=3))
            Line((-1.0824227938, 29.2862113565), (16.3887608796, 35.8408540487))
            Line((16.3887608796, 35.8408540487), (-1.3610265687, 27.1718096203))
            add(Edge.make_bspline(
                [(-28.3569605203, 6.3584583539), (-28.2130936728, 6.6411128815), (-27.8271836576, 7.4023465501), (-25.7733867324, 10.6560215753), (-22.0445767964, 14.6239494535), (-17.4960241663, 17.781024568), (-12.7864597899, 21.8271717018), (-5.5598486203, 25.0804798141), (-1.3610265687, 27.1718096203)],
                knots=[0, 0, 0, 0, 0.0755576656, 0.2159621836, 0.3892077102, 0.5588631934, 0.7384412181, 1, 1, 1, 1], degree=3))
            add(Edge.make_bspline(
                [(-22.540475484, -6.3254620685), (-22.9495394006, -6.2736672328), (-24.22734435, -6.0317724791), (-26.6434003655, -4.1641087229), (-28.453733366, -2.0639095463), (-29.2248130286, 0.0009913676), (-29.6205864439, 3.0557923807), (-28.9095027831, 5.3913160175), (-28.3569605203, 6.3584583539)],
                knots=[0.2472364924, 0.2472364924, 0.2472364924, 0.2472364924, 0.3239532439, 0.4674432485, 0.5991747745, 0.7144941387, 0.852062496, 1, 1, 1, 1], degree=3))
        make_face(mode=Mode.SUBTRACT)
    extrude(amount=F3_DEPTH)


solid = f1.part
